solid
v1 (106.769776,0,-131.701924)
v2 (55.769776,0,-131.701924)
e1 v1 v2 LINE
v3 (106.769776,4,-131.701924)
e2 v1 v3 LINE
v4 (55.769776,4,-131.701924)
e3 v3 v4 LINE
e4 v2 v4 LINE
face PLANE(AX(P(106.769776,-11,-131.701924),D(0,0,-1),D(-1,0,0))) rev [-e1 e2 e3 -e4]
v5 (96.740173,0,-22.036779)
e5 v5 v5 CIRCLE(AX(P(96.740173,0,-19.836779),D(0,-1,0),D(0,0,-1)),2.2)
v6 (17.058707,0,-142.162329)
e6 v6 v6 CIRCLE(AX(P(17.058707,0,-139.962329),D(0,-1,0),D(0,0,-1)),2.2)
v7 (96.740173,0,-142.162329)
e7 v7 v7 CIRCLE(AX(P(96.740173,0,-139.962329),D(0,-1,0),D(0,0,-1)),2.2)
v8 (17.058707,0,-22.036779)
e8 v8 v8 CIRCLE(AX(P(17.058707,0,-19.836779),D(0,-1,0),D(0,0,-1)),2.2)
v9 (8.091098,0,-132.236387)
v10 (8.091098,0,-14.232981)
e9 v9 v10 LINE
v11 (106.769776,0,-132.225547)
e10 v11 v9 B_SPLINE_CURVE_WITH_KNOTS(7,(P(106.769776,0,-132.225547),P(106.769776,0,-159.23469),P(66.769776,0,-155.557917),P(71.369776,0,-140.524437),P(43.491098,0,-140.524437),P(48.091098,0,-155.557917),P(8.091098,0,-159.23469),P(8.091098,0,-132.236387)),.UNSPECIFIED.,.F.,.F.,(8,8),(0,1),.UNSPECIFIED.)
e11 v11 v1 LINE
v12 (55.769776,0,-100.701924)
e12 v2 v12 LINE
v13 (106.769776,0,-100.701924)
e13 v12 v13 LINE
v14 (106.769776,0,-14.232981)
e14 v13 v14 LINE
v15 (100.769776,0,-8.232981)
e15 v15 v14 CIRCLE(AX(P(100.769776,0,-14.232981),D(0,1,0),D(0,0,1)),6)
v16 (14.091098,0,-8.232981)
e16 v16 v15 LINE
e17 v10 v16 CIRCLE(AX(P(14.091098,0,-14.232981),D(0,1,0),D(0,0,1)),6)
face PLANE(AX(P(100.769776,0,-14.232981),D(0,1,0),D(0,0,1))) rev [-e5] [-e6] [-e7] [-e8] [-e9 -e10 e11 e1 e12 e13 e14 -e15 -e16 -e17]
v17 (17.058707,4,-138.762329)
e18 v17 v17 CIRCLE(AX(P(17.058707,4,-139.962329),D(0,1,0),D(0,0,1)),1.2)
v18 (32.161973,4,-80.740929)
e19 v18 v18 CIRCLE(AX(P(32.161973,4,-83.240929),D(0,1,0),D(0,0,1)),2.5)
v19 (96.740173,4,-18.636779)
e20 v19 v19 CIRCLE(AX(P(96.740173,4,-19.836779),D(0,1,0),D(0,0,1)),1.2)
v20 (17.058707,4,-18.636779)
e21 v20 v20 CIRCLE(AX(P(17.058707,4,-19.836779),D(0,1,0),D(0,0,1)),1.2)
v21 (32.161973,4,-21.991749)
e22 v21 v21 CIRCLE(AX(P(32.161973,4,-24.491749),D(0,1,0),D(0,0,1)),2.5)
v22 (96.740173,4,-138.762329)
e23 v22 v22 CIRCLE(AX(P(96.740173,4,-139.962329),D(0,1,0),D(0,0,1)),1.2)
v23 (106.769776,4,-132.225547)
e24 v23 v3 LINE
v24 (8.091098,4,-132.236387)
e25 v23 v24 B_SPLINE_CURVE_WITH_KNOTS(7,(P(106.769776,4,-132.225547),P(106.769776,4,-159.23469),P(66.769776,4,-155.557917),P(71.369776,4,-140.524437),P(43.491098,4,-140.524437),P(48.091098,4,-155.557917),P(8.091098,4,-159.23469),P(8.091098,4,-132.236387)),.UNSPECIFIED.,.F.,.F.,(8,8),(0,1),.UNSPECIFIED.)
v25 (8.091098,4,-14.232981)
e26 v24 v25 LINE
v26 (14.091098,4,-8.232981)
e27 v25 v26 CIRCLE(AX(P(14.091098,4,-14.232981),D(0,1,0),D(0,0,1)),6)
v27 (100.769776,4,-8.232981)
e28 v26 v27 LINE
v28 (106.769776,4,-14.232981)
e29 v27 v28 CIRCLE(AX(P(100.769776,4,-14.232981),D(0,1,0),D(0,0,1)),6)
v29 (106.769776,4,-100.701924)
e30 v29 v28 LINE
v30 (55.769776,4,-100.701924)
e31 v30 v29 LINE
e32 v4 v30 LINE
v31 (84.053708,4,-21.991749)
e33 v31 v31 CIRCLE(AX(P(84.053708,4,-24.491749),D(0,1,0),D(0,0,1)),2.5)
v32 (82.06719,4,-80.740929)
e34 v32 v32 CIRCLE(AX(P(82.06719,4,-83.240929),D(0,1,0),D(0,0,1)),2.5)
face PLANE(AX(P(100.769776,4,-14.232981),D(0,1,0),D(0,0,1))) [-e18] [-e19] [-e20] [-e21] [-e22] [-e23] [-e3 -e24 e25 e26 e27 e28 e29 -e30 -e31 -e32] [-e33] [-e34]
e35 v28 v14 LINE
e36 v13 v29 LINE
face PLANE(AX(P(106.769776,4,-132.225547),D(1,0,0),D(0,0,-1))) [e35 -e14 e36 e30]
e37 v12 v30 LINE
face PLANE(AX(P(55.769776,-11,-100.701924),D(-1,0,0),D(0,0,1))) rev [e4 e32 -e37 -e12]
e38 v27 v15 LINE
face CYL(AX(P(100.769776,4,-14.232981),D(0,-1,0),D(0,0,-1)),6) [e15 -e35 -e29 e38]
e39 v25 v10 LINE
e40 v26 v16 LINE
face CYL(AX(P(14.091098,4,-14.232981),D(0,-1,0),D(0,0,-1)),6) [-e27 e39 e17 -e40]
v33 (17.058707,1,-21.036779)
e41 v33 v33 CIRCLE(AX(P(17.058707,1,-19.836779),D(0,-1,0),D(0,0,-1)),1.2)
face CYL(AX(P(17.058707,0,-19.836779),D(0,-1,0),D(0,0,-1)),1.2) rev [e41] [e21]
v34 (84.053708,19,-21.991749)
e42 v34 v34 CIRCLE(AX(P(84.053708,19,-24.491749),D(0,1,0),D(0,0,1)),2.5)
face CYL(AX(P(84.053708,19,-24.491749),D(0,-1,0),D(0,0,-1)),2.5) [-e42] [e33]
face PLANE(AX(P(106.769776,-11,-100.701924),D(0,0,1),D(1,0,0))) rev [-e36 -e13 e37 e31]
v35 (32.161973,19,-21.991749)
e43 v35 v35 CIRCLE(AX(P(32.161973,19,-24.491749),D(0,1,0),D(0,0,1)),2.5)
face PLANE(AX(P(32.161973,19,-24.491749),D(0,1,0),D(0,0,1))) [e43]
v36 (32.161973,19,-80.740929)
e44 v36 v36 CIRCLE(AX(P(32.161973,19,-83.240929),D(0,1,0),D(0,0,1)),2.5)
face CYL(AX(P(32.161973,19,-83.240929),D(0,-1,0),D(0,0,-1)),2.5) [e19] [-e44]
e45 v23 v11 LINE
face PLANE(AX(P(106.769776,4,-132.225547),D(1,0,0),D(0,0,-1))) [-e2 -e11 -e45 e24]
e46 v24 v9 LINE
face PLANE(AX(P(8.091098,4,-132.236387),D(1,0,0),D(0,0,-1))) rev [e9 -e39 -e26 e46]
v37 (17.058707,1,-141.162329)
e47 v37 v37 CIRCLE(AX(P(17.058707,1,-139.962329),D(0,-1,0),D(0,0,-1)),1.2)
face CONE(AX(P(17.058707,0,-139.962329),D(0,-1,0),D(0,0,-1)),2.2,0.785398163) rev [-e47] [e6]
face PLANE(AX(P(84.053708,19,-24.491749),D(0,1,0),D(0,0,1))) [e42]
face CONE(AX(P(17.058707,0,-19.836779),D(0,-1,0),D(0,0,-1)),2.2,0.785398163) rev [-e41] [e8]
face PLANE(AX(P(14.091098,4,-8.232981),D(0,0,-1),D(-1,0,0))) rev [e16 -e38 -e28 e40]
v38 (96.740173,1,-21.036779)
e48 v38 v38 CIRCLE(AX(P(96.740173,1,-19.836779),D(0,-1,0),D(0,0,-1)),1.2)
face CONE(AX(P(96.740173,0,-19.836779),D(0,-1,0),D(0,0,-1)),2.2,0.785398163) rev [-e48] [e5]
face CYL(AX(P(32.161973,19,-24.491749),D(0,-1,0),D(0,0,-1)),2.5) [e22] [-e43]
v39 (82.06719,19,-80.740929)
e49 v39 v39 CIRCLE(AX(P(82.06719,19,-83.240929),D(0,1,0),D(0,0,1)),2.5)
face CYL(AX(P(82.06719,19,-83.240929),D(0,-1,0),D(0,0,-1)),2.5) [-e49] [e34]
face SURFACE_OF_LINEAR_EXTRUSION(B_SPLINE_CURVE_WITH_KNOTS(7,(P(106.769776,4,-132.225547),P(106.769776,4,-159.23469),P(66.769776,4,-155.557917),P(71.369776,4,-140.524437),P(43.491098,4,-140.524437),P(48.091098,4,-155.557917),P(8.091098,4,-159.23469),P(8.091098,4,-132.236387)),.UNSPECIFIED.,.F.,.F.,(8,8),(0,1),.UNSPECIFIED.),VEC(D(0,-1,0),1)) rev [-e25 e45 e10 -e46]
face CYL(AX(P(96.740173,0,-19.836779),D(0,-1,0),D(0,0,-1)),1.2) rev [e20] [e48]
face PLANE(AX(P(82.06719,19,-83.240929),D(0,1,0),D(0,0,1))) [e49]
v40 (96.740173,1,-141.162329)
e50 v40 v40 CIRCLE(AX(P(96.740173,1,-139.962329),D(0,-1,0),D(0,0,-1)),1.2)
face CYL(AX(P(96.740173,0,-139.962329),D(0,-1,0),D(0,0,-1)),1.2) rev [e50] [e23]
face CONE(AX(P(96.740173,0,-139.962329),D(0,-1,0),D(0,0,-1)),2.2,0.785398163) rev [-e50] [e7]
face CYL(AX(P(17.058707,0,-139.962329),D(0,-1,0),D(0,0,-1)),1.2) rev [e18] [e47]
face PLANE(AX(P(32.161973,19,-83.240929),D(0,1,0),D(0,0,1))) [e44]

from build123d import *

# Parameters (mm, degrees)
BOSS_EXTRUDE1_DEPTH                             = 4
SKETCH2_R                                       = 2.5
BOSS_EXTRUDE2_DEPTH                             = 15
SKETCH3_W                                       = 51
SKETCH3_H                                       = 31
CUT_EXTRUDE1_DEPTH                              = 15
CSK_FOR_M2_FLAT_HEAD_MACHINE_SCREW1_D           = 2.4
CSK_FOR_M2_FLAT_HEAD_MACHINE_SCREW1_DEPTH       = 58
CSK_FOR_M2_FLAT_HEAD_MACHINE_SCREW1_CSINK_D     = 4.4
CSK_FOR_M2_FLAT_HEAD_MACHINE_SCREW1_CSINK_ANGLE = 90
CSK_FOR_M2_FLAT_HEAD_MACHINE_SCREW1_TIP         = 0.721032743


# Read off the part's stored shape, not the designer's step: Boss-Extrude1
with BuildPart() as part:
    # Boss-Extrude1 outline → Boss-Extrude1 (new body)
    with BuildSketch(Plane(origin=(0, 0, 0), x_dir=(1, 0, 0), z_dir=(0, 1, 0))):
        with BuildLine():
            ThreePointArc((100.769776489, 8.232980914), (105.012417176, 9.990340227), (106.769776489, 14.232980914))
            Line((106.769776489, 14.232980914), (106.769776489, 132.22554715))
            add(Edge.make_bspline(
                [(106.769776489, 132.22554715), (106.769776489, 159.234690285), (66.769776489, 155.557917259), (71.369776489, 140.524437357), (43.491097907, 140.524437357), (48.091097907, 155.557917259), (8.091097907, 159.234690285), (8.091097907, 132.236386798)],
                knots=[0, 0, 0, 0, 0, 0, 0, 0, 1, 1, 1, 1, 1, 1, 1, 1], degree=7))
            Line((8.091097907, 132.236386798), (8.091097907, 14.232980914))
            ThreePointArc((8.091097907, 14.232980914), (9.84845722, 9.990340227), (14.091097907, 8.232980914))
            Line((14.091097907, 8.232980914), (100.769776489, 8.232980914))
        make_face()
    extrude(amount=BOSS_EXTRUDE1_DEPTH)

    # Sketch2 → Boss-Extrude2 (add)
    with BuildSketch(Plane(origin=(0, 4, 0), x_dir=(1, 0, 0), z_dir=(0, 1, 0))):
        with Locations(Location((32.161972906, 83.24092865, 0), (0, 0, 270))):
            Circle(SKETCH2_R)
        with Locations(Location((82.067189883, 83.24092865, 0), (0, 0, 270))):
            Circle(SKETCH2_R)
        with Locations(Location((32.161972906, 24.49174917, 0), (0, 0, 270))):
            Circle(SKETCH2_R)
        with Locations(Location((84.053708344, 24.49174917, 0), (0, 0, 270))):
            Circle(SKETCH2_R)
    extrude(amount=BOSS_EXTRUDE2_DEPTH)

    # Sketch3 → Cut-Extrude1 (cut)
    with BuildSketch(Plane(origin=(0, 4, 0), x_dir=(1, 0, 0), z_dir=(0, 1, 0))):
        with Locations((81.269776489, 116.201924425)):
            Rectangle(SKETCH3_W, SKETCH3_H)
    extrude(amount=-CUT_EXTRUDE1_DEPTH, mode=Mode.SUBTRACT)

    # CSK for M2 Flat Head Machine Screw1
    with Locations(Plane(origin=(17.058706918, 0, -139.962329176), x_dir=(0, 0, -1), z_dir=(0, -1, 0))):
        with Locations((0, 0), (0, 79.68146648), (-120.125549754, 0), (-120.125549754, 79.68146648)):
            CounterSinkHole(CSK_FOR_M2_FLAT_HEAD_MACHINE_SCREW1_D / 2, CSK_FOR_M2_FLAT_HEAD_MACHINE_SCREW1_CSINK_D / 2, depth=CSK_FOR_M2_FLAT_HEAD_MACHINE_SCREW1_DEPTH, counter_sink_angle=CSK_FOR_M2_FLAT_HEAD_MACHINE_SCREW1_CSINK_ANGLE)
            with Locations((0, 0, -(CSK_FOR_M2_FLAT_HEAD_MACHINE_SCREW1_DEPTH + CSK_FOR_M2_FLAT_HEAD_MACHINE_SCREW1_TIP / 2))):  # 118° drill point
                Cone(0, CSK_FOR_M2_FLAT_HEAD_MACHINE_SCREW1_D / 2, CSK_FOR_M2_FLAT_HEAD_MACHINE_SCREW1_TIP, mode=Mode.SUBTRACT)


solid = part.part
